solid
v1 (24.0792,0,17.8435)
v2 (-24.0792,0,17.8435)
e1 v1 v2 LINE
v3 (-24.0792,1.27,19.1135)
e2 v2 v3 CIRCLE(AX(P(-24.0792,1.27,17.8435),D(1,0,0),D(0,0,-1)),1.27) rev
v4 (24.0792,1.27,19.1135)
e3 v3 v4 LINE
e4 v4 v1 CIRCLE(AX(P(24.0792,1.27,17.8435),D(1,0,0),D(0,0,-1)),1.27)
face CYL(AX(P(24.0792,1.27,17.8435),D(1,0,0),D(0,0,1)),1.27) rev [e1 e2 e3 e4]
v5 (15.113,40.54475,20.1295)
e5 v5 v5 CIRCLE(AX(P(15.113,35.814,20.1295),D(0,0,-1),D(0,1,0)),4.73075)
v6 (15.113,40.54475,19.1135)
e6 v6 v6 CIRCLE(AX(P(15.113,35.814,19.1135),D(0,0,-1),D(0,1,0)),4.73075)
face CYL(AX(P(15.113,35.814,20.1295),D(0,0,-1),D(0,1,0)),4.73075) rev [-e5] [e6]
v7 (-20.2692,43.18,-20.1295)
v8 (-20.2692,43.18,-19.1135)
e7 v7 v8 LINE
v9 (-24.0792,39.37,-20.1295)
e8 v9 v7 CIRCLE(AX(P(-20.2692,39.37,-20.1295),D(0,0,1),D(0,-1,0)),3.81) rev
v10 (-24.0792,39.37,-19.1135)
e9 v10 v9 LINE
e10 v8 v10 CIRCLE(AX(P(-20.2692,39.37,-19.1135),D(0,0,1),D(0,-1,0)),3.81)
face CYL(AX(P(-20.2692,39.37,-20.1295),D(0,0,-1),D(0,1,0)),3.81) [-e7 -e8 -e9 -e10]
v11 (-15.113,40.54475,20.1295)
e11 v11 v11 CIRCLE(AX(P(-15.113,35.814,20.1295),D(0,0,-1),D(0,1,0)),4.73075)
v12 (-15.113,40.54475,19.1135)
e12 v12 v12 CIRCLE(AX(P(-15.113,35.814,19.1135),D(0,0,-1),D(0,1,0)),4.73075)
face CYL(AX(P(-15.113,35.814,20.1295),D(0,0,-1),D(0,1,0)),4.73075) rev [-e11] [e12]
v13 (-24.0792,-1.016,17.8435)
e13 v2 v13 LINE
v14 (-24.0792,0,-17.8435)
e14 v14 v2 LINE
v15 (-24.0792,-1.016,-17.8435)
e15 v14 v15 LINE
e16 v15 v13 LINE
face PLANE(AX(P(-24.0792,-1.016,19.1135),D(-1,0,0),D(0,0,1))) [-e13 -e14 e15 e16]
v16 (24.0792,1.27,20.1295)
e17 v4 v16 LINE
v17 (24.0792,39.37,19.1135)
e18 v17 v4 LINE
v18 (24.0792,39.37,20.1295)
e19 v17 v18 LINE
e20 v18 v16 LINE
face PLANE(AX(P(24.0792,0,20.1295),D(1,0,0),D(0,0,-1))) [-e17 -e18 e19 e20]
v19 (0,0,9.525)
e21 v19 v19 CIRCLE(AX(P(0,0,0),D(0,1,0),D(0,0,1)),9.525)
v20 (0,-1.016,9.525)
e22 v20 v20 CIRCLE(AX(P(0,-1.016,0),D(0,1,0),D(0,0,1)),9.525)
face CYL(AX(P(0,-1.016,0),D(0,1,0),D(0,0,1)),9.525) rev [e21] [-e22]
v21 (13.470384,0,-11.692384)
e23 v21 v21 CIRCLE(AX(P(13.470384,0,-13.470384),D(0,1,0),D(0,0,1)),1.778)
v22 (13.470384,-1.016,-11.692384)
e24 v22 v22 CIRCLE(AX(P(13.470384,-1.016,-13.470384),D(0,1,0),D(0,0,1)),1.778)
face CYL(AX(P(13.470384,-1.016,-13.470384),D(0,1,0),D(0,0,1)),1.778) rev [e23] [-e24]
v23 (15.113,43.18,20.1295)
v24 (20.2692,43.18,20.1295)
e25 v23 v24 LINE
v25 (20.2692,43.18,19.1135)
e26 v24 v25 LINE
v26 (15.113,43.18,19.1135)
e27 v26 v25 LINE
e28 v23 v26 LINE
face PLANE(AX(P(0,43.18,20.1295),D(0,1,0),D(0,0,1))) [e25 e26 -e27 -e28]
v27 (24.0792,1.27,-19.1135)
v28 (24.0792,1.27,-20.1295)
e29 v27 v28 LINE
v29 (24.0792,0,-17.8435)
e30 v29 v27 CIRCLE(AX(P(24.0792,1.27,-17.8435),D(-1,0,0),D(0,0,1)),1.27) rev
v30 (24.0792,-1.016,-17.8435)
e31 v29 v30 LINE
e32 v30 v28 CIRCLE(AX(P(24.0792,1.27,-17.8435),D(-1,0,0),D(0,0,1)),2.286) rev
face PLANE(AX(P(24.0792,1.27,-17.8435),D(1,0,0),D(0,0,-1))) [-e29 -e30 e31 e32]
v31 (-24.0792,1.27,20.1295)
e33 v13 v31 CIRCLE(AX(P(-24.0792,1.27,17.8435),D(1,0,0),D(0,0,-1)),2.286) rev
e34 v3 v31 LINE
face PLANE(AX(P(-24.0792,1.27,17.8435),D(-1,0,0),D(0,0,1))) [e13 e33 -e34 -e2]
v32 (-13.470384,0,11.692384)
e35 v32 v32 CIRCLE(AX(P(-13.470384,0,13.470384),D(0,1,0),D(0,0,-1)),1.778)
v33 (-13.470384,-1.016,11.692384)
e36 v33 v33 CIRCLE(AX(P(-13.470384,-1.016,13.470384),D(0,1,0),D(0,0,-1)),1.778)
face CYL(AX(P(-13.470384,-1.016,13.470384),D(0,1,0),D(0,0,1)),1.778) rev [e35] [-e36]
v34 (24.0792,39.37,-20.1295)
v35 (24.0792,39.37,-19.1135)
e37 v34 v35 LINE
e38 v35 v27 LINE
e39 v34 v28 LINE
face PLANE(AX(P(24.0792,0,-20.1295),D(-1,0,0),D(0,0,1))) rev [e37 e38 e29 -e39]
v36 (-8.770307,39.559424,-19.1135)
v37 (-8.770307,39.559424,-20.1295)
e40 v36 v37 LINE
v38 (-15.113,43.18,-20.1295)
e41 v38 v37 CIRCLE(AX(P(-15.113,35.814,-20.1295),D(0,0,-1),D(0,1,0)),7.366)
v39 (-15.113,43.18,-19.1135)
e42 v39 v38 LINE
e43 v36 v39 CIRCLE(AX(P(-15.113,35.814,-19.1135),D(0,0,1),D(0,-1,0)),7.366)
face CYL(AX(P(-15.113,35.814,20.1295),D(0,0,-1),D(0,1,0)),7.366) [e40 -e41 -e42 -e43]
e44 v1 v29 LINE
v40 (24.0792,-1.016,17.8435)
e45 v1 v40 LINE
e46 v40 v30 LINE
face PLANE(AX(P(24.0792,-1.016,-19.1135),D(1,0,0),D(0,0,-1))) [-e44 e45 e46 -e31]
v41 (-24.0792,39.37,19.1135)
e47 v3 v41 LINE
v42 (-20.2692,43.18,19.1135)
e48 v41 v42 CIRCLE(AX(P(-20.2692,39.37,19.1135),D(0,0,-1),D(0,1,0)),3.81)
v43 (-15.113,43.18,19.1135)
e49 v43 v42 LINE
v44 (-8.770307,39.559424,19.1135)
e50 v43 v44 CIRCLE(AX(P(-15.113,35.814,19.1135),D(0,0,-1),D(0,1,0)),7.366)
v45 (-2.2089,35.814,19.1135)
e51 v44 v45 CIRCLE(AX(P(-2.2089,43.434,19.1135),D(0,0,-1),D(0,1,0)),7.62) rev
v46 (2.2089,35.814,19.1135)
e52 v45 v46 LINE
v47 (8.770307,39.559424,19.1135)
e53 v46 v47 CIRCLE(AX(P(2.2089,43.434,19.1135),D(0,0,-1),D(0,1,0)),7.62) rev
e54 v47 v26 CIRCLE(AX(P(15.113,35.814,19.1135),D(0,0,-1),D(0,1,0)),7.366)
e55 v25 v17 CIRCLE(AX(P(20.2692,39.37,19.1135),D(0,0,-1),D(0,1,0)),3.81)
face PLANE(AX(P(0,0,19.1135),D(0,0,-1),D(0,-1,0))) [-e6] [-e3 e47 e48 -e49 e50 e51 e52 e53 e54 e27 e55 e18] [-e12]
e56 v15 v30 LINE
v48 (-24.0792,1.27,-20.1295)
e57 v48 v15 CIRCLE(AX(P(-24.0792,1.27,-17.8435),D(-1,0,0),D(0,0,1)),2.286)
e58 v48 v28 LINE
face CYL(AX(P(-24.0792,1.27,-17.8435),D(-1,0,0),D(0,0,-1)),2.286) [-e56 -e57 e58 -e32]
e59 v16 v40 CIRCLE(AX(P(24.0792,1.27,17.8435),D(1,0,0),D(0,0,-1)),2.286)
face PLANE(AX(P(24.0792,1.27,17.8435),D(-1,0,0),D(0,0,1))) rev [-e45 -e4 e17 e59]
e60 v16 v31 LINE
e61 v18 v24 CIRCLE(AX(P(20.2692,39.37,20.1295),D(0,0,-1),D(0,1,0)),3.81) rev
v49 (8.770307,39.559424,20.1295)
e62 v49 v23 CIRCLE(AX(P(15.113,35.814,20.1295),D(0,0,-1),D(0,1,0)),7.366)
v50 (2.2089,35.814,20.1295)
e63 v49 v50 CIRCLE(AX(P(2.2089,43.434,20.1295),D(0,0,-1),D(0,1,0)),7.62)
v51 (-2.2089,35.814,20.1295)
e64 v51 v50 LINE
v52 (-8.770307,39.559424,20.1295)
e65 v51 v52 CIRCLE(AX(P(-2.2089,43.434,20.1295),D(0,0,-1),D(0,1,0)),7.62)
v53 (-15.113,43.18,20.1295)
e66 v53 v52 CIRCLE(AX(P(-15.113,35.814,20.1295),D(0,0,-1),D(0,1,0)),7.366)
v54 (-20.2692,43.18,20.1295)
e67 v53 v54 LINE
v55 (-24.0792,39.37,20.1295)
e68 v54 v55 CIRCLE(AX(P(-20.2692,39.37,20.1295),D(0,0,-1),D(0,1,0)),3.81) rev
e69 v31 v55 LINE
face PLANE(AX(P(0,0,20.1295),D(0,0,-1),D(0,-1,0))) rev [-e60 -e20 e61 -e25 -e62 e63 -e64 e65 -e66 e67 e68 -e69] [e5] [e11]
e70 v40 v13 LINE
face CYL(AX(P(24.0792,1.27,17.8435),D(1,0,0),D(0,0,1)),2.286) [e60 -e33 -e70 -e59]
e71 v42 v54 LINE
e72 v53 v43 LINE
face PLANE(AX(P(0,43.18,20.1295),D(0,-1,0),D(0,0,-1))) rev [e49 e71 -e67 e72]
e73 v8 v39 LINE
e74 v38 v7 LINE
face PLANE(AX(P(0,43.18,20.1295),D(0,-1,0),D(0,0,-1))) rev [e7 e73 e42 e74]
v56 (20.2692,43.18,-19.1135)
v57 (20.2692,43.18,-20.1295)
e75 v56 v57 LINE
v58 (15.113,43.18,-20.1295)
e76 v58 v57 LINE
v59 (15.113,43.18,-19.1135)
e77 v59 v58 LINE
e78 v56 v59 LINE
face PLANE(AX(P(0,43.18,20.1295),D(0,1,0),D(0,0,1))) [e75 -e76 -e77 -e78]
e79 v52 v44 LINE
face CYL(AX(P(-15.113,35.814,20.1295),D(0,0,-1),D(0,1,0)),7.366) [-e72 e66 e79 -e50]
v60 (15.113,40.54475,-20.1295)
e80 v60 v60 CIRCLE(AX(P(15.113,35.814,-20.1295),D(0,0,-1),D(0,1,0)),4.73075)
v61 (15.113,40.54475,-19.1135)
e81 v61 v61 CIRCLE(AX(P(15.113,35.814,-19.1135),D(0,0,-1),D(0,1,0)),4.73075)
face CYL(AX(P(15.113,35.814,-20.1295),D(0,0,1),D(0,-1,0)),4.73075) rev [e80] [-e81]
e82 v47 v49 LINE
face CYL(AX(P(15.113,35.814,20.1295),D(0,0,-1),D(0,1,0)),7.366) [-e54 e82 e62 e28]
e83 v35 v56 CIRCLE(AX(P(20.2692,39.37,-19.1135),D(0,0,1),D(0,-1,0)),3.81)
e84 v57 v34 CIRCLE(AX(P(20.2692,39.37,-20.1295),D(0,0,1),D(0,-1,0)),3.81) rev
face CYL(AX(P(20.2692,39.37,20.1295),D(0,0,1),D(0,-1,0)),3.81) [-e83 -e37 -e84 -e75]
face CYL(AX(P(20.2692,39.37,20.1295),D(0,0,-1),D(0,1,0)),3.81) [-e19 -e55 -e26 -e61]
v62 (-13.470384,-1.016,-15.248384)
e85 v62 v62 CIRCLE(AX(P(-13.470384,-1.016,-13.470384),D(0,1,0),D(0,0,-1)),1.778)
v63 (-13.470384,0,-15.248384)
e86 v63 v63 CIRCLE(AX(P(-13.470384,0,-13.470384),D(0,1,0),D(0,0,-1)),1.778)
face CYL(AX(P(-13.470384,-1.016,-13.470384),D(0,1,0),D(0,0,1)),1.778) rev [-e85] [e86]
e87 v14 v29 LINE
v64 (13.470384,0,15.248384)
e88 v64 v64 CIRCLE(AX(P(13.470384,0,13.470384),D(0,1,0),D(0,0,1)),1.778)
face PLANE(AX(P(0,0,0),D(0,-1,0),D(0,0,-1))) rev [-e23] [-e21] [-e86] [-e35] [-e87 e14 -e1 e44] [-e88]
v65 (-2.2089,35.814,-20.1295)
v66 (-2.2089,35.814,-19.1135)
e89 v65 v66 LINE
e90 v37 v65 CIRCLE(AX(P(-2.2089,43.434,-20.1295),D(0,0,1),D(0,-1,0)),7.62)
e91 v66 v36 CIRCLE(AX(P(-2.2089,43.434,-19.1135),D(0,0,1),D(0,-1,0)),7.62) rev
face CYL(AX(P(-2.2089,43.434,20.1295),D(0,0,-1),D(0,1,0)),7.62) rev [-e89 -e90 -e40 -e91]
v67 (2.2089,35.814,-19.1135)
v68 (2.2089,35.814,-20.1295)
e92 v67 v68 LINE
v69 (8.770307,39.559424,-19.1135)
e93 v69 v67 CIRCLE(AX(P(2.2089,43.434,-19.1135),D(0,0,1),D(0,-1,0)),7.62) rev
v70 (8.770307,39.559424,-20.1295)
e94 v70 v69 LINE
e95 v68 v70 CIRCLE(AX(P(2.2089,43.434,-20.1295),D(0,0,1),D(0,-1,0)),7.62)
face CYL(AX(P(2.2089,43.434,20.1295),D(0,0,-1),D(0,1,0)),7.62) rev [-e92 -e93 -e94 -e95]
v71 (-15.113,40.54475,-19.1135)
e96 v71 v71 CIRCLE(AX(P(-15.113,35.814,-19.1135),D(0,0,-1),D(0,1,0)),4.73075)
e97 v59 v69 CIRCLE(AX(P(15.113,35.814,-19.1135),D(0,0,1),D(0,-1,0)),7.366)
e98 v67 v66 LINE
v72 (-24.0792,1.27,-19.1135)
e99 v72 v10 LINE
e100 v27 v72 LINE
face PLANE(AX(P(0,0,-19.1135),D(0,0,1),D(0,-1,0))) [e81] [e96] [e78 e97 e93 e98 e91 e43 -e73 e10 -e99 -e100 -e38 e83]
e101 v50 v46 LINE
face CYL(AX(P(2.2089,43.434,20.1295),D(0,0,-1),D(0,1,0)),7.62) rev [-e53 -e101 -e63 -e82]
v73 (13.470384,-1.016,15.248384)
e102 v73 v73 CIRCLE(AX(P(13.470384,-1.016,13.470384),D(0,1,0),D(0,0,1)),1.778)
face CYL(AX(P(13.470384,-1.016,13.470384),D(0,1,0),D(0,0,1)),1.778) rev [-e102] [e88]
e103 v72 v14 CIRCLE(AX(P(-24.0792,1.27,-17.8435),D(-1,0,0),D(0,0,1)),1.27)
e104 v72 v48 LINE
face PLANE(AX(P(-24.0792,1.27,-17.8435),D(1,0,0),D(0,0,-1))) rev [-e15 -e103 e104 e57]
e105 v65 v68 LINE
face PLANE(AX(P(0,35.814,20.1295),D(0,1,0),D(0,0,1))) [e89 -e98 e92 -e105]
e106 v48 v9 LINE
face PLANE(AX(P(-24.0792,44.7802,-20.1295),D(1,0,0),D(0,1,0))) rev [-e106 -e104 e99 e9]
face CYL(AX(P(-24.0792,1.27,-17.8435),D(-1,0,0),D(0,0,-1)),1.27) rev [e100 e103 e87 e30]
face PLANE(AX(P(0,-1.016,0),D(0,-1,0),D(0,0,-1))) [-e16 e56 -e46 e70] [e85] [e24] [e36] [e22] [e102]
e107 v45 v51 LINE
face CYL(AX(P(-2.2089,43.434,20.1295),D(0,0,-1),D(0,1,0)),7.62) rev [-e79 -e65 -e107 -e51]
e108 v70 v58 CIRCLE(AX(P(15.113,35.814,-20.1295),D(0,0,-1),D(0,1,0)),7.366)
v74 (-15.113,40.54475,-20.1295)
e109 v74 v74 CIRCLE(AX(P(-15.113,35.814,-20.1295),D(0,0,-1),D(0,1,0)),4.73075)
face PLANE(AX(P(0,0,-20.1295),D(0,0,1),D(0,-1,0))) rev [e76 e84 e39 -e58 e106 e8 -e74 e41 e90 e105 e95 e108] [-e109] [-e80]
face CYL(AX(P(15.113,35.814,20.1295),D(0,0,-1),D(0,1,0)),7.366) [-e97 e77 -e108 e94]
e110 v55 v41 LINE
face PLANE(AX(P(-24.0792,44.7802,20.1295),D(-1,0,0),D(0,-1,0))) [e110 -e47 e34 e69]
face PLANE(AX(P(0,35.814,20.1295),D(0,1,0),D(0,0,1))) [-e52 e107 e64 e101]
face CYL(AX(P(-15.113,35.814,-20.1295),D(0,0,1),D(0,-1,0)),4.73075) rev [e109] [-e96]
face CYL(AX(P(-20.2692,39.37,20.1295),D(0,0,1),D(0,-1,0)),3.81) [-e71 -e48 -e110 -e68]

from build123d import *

# Parameters (mm, degrees)
SKETCH1_W                    = 48.1584
SKETCH1_H                    = 38.227
SKETCH1_R                    = 9.525
SKETCH1_R_2                  = 1.778
BASE_FLANGE1_DEPTH           = 1.016
EDGE_FLANGE1_STRIP_W         = 6.604
EDGE_FLANGE1_STRIP_H         = 1.016
EDGE_FLANGE1_STRIP_CUT_DEPTH = 48.1584
EDGE_FLANGE1_DEPTH           = 48.1584
EDGE_FLANGE1_START           = 1.016
EDGE_FLANGE1_PROFILE_W       = 48.1584
EDGE_FLANGE1_PROFILE_H       = 43.5102
EDGE_FLANGE1_PROFILE_R       = 4.73075
EDGE_FLANGE1_FLAT_DEPTH      = 1.016
CUT_EXTRUDE7_DEPTH           = 65.852611865
FILLET2_R                    = 7.62
FILLET3_R                    = 3.81


# Sheet-metal steps are written as plain solids
with BuildPart() as part:
    # Sketch1 → Base-Flange1 (new body)
    with BuildSketch(Plane(origin=(0, 0, 0), x_dir=(1, 0, 0), z_dir=(0, 1, 0))):
        Rectangle(SKETCH1_W, SKETCH1_H)
        with Locations(Location((0, 0, 0), (0, 0, 270))):
            Circle(SKETCH1_R, mode=Mode.SUBTRACT)
        with Locations(Location((13.470384182, -13.470384182, 0), (0, 0, 270))):
            Circle(SKETCH1_R_2, mode=Mode.SUBTRACT)
        with Locations(Location((13.470384182, 13.470384182, 0), (0, 0, 270))):
            Circle(SKETCH1_R_2, mode=Mode.SUBTRACT)
        with Locations(Location((-13.470384182, 13.470384182, 0), (0, 0, 90))):
            Circle(SKETCH1_R_2, mode=Mode.SUBTRACT)
        with Locations(Location((-13.470384182, -13.470384182, 0), (0, 0, 90))):
            Circle(SKETCH1_R_2, mode=Mode.SUBTRACT)
    extrude(amount=-BASE_FLANGE1_DEPTH)

    # Edge-Flange1 strip (across the edge) → Edge-Flange1 strip cut (cut)
    with BuildSketch(Plane(origin=(24.0792, 0, -19.1135), x_dir=(0, 0, 1), z_dir=(-1, 0, 0))):
        with Locations((-2.032, -0.508)):
            Rectangle(EDGE_FLANGE1_STRIP_W, EDGE_FLANGE1_STRIP_H)
    edge_flange1_strip_cut = extrude(amount=EDGE_FLANGE1_STRIP_CUT_DEPTH, mode=Mode.SUBTRACT)

    # Edge-Flange1 bend section (across the edge) → Edge-Flange1 (add)
    with BuildSketch(Plane(origin=(24.0792, 0, -19.1135), x_dir=(0, 0, 1), z_dir=(-1, 0, 0))):
        with BuildLine():
            Line((-1.016, 1.27), (0, 1.27))
            ThreePointArc((0, 1.27), (0.371974388, 0.371974388), (1.27, 0))
            Line((1.27, 0), (1.27, -1.016))
            ThreePointArc((1.27, -1.016), (-0.346446102, -0.346446102), (-1.016, 1.27))
        make_face()
    edge_flange1 = extrude(amount=EDGE_FLANGE1_DEPTH)

    # Edge-Flange1 profile (on flange) → Edge-Flange1 flat (add)
    with BuildSketch(Plane(origin=(0, 0, -19.1135), x_dir=(-1, 0, 0), z_dir=(0, 0, -1)).offset(EDGE_FLANGE1_START)):
        with Locations((0, 23.0251)):
            Rectangle(EDGE_FLANGE1_PROFILE_W, EDGE_FLANGE1_PROFILE_H)
        with Locations((-15.113, 35.814)):
            Circle(EDGE_FLANGE1_PROFILE_R, mode=Mode.SUBTRACT)
        with Locations((15.113, 35.814)):
            Circle(EDGE_FLANGE1_PROFILE_R, mode=Mode.SUBTRACT)
    edge_flange1_flat = extrude(amount=-EDGE_FLANGE1_FLAT_DEPTH)

    # Mirror1: Edge-Flange1 strip cut, Edge-Flange1, Edge-Flange1 flat across plane
    add(edge_flange1_strip_cut.mirror(Plane.XY), mode=Mode.SUBTRACT)
    add(edge_flange1.mirror(Plane.XY))
    add(edge_flange1_flat.mirror(Plane.XY))

    # Sketch11 → Cut-Extrude7 (cut, through all)
    with BuildSketch(Plane(origin=(0, 0, -20.1295), x_dir=(-1, 0, 0), z_dir=(0, 0, -1))):
        with BuildLine():
            Line((24.0792, 43.18), (24.0792, 44.7802))
            Line((24.0792, 44.7802), (-24.0792, 44.7802))
            Line((-24.0792, 44.7802), (-24.0792, 43.18))
            Line((-24.0792, 43.18), (-15.113, 43.18))
            ThreePointArc((-15.113, 43.18), (-9.90445145, 41.02254855), (-7.747, 35.814))
            Line((-7.747, 35.814), (7.747, 35.814))
            ThreePointArc((7.747, 35.814), (9.90445145, 41.02254855), (15.113, 43.18))
            Line((15.113, 43.18), (24.0792, 43.18))
        make_face()
    extrude(amount=-CUT_EXTRUDE7_DEPTH, mode=Mode.SUBTRACT)

    # Fillet2
    fillet2_edges = [part.edges().sort_by_distance(p)[0] for p in [
        (7.747, 35.814, -19.6215),
        (-7.747, 35.814, -19.6215),
        (7.747, 35.814, 19.6215),
        (-7.747, 35.814, 19.6215),
    ]]
    fillet(fillet2_edges, radius=FILLET2_R)

    # Fillet3
    fillet3_edges = [part.edges().sort_by_distance(p)[0] for p in [
        (-24.0792, 43.18, -19.6215),
        (24.0792, 43.18, -19.6215),
        (24.0792, 43.18, 19.6215),
        (-24.0792, 43.18, 19.6215),
    ]]
    fillet(fillet3_edges, radius=FILLET3_R)


solid = part.part
